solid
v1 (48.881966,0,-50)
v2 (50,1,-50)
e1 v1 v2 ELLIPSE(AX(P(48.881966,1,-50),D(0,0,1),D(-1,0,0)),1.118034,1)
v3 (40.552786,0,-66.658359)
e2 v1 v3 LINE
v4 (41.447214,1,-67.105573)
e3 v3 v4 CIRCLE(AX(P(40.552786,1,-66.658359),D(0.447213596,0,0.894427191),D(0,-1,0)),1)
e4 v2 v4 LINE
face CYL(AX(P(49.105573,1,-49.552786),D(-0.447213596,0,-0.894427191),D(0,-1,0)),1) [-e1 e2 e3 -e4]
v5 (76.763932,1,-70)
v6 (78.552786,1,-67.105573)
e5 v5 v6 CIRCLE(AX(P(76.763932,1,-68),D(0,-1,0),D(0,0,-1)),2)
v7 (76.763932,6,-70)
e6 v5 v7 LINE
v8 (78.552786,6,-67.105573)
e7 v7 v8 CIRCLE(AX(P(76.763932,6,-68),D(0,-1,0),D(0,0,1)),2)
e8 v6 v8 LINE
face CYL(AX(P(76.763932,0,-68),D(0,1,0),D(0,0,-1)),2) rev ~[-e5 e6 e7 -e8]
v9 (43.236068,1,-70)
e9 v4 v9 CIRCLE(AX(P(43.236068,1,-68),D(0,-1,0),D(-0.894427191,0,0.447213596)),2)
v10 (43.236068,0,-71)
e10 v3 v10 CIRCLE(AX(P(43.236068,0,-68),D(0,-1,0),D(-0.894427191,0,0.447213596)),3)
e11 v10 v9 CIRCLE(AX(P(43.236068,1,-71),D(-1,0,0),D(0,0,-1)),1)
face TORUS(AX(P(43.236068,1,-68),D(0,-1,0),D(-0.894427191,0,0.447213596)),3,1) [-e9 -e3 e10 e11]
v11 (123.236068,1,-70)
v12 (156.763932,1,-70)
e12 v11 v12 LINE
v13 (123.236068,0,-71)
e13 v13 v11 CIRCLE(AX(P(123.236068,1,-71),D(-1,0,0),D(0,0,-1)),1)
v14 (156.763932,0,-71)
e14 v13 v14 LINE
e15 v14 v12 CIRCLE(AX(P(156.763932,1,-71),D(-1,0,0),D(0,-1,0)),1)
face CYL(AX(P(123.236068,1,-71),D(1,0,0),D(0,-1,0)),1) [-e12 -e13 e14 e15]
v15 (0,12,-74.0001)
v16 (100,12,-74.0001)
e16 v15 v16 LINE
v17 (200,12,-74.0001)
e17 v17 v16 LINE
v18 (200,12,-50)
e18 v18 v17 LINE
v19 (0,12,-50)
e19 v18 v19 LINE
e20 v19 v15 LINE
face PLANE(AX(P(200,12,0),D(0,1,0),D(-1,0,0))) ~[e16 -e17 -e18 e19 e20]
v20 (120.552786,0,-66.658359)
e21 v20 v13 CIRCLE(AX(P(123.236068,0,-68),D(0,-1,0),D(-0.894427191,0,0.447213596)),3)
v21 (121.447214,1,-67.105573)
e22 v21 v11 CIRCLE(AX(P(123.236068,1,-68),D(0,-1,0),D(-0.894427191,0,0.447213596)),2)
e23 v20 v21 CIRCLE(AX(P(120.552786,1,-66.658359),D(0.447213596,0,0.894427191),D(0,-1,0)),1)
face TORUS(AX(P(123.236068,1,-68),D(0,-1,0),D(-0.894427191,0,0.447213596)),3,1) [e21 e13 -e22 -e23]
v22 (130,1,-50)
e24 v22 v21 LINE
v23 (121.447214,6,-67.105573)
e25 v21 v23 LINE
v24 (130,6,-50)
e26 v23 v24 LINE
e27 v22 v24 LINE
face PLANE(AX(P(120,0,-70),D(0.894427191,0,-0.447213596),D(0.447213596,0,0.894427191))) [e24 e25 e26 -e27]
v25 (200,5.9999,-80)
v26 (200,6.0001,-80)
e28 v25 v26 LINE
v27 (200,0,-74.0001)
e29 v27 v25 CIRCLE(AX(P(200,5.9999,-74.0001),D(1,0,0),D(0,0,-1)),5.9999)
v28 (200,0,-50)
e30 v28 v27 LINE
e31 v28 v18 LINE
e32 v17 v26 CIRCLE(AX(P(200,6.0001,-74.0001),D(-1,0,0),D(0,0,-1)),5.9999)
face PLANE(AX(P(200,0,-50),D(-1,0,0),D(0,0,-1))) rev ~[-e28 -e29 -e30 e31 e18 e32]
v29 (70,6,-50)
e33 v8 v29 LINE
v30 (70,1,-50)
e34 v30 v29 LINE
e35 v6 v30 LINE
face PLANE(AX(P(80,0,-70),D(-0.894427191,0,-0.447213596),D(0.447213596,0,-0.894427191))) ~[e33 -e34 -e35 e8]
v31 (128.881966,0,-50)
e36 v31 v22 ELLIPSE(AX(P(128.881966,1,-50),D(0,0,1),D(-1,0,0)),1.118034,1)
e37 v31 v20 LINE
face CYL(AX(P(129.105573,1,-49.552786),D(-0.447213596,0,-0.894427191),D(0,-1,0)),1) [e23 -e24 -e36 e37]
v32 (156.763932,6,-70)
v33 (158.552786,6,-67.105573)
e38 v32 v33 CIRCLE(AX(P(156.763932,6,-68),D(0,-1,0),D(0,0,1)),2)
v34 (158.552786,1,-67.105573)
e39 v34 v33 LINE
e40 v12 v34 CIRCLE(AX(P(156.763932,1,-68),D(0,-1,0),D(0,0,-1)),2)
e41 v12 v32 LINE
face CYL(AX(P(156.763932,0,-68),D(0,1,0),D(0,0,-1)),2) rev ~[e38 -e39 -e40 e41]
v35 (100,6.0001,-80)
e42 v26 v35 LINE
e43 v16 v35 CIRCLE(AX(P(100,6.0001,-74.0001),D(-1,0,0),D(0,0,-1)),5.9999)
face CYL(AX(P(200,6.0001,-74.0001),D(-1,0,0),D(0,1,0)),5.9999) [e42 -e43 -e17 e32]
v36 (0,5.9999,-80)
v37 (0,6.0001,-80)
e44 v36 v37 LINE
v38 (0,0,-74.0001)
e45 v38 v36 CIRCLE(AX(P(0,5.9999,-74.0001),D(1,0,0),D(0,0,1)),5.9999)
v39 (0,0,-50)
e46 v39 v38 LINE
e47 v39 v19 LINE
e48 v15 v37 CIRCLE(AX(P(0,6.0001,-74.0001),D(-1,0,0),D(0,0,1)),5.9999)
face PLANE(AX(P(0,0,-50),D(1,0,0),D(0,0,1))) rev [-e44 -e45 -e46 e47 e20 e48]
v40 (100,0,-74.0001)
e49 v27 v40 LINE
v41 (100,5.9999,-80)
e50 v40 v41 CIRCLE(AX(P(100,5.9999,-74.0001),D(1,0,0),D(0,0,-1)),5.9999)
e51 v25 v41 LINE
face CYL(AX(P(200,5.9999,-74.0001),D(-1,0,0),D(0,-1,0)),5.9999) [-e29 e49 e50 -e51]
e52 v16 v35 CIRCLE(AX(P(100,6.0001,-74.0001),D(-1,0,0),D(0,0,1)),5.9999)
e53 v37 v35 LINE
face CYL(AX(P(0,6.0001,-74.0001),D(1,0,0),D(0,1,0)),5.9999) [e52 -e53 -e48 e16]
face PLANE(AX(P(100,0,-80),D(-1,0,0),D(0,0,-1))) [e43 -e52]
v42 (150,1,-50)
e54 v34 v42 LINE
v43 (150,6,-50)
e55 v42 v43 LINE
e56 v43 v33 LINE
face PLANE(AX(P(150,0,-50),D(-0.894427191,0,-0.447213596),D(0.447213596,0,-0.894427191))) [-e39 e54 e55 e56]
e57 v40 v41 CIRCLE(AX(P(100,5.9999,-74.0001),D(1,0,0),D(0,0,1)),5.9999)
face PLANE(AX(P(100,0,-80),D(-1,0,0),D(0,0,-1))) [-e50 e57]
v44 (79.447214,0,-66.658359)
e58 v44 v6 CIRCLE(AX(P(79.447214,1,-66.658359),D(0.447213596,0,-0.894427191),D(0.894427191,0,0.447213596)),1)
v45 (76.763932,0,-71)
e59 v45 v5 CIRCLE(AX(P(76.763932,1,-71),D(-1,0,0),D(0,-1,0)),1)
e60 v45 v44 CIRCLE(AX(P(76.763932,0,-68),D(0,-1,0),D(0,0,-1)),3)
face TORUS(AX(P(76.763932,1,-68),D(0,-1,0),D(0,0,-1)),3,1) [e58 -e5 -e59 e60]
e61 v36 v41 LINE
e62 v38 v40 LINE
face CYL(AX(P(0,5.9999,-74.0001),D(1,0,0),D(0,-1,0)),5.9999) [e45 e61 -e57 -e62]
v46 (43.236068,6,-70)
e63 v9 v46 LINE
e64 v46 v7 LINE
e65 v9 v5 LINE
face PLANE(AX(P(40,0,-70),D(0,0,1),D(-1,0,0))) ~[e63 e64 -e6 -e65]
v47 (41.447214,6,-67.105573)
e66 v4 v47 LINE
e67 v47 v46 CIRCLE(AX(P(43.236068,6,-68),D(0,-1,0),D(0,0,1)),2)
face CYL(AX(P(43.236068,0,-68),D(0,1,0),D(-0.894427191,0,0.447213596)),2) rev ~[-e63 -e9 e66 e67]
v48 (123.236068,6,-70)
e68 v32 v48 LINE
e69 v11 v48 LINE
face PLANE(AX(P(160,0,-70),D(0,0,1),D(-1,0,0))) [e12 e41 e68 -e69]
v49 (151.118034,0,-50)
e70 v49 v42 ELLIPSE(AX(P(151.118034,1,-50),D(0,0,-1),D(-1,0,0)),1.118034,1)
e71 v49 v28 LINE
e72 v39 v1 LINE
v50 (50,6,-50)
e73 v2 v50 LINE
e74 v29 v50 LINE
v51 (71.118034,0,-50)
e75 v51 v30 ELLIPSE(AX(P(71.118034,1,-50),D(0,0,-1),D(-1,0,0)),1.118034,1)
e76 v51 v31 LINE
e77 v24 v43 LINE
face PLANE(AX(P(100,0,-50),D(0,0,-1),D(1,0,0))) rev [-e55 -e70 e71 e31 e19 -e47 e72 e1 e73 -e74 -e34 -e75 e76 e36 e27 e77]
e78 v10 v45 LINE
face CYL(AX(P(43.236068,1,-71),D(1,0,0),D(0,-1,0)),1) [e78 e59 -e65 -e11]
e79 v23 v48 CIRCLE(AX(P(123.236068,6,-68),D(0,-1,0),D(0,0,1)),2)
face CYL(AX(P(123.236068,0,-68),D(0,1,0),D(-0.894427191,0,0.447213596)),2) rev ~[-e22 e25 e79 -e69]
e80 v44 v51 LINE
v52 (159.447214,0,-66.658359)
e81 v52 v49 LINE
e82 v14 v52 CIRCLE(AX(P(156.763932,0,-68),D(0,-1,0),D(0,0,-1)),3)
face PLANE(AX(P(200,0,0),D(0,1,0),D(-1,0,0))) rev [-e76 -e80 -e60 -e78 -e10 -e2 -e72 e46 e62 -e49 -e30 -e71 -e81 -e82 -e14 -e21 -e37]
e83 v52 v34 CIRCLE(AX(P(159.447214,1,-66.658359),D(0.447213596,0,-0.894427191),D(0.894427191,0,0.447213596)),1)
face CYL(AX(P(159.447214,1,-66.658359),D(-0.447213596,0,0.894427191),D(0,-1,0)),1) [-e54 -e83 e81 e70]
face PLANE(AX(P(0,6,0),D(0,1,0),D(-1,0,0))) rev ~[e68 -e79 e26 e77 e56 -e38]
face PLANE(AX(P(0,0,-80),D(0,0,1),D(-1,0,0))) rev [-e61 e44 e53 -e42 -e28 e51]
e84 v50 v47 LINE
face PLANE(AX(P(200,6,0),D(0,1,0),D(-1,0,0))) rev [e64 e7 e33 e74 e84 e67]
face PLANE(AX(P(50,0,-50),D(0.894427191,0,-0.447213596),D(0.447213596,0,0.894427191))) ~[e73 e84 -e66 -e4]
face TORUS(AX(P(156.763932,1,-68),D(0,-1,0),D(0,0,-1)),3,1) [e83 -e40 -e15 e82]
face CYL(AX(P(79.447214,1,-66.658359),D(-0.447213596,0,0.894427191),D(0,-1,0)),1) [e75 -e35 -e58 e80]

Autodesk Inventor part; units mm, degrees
ref_plane "YZ Plane" through (0, 0, 0) normal (1, 0, 0) x (0, 1, 0)
ref_plane "XZ Plane" through (0, 0, 0) normal (0, 1, 0) x (-1, 0, 0)
ref_plane "XY Plane" through (0, 0, 0) normal (0, 0, 1) x (1, 0, 0)
sketch "Sketch1" plane through (0, 0, 0) normal (0, 1, 0) x (-1, 0, 0)
  line L0 (100, -50) -> (-100, -50)
  line L1 (-100, -50) -> (-100, 50)
  line L2 (-100, 50) -> (100, 50)
  line L3 (100, 50) -> (100, -50)
  line L4 (100, -50) -> (-100, 50) construction
  line L5 (-100, -50) -> (100, 50) construction
  line L6 (-40, -30) -> (-80, -30)
  line L7 (-50, -50) -> (-70, -50)
  line L8 (-40, -30) -> (-50, -50)
  line L9 (-80, -30) -> (-70, -50)
  line L10 (80, -30) -> (40, -30)
  line L11 (70, -50) -> (50, -50)
  line L12 (80, -30) -> (70, -50)
  line L13 (40, -30) -> (50, -50)
  line L14 (-100, -10) -> (-100, 10)
  line L15 (-80, -20) -> (-80, 20)
  line L16 (-80, -20) -> (-100, -10)
  line L17 (-80, 20) -> (-100, 10)
  line L18 (100, -50) -> (-100, -50)
  line L19 (-100, -50) -> (-100, -80)
  line L20 (-100, -80) -> (100, -80)
  line L21 (100, -80) -> (100, -50)
  line L22 (-40, -70) -> (-80, -70)
  line L23 (-40, -70) -> (-50, -50)
  line L24 (-80, -70) -> (-70, -50)
  line L25 (80, -70) -> (40, -70)
  line L26 (80, -70) -> (70, -50)
  line L27 (40, -70) -> (50, -50)
  line L28 (-100, -80) -> (-200, -80)
  line L29 (-200, -80) -> (-200, -50)
  line L30 (-200, -50) -> (-100, -50)
  line L31 (-100, -50) -> (-100, -80)
  line L32 (-160, -70) -> (-150, -50)
  line L33 (-160, -70) -> (-120, -70)
  line L34 (-120, -70) -> (-130, -50)
  line L35 (0, -80) -> (0, -50)
  point P0 (0, 0)
  point P1 (-100, 10)
  point P2 (-100, -10)
  point P3 (-70, -50)
  point P4 (-50, -50)
  point P5 (70, -50)
  point P6 (0, 0)
  point P7 (0, 0)
  point P8 (-100, -50)
  point P9 (-100, -50)
  point P10 (-100, -50)
  dimension "d72" = 200
  dimension "d73" = 100
  dimension "d78" = 20
  dimension "d79" = 40
  dimension "d80" = 20
  dimension "d81" = 10
  dimension "d82" = 20
  dimension "d83" = 40
  dimension "d84" = 20
  dimension "d85" = 10
  dimension "d86" = 120
  dimension "d87" = 30
  dimension "d88" = 0
  dimension "d89" = 0
  dimension "d90" = 40
  dimension "d91" = 20
  dimension "d92" = 20
  dimension "d93" = 10
  dimension "d94" = 40
  dimension "d95" = 0
  dimension "d114" = 200
  dimension "d115" = 30
  dimension "d128" = 100
sketch "Sketch1 outline for Extrusion28" plane through (0, 0, 0) normal (0, 1, 0) x (-1, 0, 0)
  line L0 (-200, -50) -> (-200, -80)
  line L1 (-100, -50) -> (-200, -50)
  line L2 (-100, -80) -> (-100, -50)
  line L3 (-200, -80) -> (-100, -80)
extrude "Extrusion28" add sketch "Sketch1 outline for Extrusion28" along normal blind 12
sketch "Sketch1 outline for Extrusion29" plane through (0, 0, 0) normal (0, 1, 0) x (-1, 0, 0)
  line L0 (-160, -70) -> (-120, -70)
  line L1 (-150, -50) -> (-160, -70)
  line L2 (-130, -50) -> (-150, -50)
  line L3 (-120, -70) -> (-130, -50)
extrude "Extrusion29" cut sketch "Sketch1 outline for Extrusion29" along normal blind 6
fillet "Fillet17" radius 6 2 edges at (150, 0, -80) (150, 12, -80)
fillet "Fillet18" radius 2 2 edges at (120, 3, -70) (160, 3, -70)
fillet "Fillet19" radius 1 5 edges at (158.4652, 0, -69.0515) (140, 0, -70) (121.5348, 0, -69.0515) (125.7236, 0, -58.5528) (154.2764, 0, -58.5528)
mirror "Mirror1" about plane through (100, 0, -80) normal (-1, 0, 0) of "Extrusion28", "Fillet17", "Extrusion29", "Fillet18", "Fillet19"
properties part number "Test2_3DPrint"
